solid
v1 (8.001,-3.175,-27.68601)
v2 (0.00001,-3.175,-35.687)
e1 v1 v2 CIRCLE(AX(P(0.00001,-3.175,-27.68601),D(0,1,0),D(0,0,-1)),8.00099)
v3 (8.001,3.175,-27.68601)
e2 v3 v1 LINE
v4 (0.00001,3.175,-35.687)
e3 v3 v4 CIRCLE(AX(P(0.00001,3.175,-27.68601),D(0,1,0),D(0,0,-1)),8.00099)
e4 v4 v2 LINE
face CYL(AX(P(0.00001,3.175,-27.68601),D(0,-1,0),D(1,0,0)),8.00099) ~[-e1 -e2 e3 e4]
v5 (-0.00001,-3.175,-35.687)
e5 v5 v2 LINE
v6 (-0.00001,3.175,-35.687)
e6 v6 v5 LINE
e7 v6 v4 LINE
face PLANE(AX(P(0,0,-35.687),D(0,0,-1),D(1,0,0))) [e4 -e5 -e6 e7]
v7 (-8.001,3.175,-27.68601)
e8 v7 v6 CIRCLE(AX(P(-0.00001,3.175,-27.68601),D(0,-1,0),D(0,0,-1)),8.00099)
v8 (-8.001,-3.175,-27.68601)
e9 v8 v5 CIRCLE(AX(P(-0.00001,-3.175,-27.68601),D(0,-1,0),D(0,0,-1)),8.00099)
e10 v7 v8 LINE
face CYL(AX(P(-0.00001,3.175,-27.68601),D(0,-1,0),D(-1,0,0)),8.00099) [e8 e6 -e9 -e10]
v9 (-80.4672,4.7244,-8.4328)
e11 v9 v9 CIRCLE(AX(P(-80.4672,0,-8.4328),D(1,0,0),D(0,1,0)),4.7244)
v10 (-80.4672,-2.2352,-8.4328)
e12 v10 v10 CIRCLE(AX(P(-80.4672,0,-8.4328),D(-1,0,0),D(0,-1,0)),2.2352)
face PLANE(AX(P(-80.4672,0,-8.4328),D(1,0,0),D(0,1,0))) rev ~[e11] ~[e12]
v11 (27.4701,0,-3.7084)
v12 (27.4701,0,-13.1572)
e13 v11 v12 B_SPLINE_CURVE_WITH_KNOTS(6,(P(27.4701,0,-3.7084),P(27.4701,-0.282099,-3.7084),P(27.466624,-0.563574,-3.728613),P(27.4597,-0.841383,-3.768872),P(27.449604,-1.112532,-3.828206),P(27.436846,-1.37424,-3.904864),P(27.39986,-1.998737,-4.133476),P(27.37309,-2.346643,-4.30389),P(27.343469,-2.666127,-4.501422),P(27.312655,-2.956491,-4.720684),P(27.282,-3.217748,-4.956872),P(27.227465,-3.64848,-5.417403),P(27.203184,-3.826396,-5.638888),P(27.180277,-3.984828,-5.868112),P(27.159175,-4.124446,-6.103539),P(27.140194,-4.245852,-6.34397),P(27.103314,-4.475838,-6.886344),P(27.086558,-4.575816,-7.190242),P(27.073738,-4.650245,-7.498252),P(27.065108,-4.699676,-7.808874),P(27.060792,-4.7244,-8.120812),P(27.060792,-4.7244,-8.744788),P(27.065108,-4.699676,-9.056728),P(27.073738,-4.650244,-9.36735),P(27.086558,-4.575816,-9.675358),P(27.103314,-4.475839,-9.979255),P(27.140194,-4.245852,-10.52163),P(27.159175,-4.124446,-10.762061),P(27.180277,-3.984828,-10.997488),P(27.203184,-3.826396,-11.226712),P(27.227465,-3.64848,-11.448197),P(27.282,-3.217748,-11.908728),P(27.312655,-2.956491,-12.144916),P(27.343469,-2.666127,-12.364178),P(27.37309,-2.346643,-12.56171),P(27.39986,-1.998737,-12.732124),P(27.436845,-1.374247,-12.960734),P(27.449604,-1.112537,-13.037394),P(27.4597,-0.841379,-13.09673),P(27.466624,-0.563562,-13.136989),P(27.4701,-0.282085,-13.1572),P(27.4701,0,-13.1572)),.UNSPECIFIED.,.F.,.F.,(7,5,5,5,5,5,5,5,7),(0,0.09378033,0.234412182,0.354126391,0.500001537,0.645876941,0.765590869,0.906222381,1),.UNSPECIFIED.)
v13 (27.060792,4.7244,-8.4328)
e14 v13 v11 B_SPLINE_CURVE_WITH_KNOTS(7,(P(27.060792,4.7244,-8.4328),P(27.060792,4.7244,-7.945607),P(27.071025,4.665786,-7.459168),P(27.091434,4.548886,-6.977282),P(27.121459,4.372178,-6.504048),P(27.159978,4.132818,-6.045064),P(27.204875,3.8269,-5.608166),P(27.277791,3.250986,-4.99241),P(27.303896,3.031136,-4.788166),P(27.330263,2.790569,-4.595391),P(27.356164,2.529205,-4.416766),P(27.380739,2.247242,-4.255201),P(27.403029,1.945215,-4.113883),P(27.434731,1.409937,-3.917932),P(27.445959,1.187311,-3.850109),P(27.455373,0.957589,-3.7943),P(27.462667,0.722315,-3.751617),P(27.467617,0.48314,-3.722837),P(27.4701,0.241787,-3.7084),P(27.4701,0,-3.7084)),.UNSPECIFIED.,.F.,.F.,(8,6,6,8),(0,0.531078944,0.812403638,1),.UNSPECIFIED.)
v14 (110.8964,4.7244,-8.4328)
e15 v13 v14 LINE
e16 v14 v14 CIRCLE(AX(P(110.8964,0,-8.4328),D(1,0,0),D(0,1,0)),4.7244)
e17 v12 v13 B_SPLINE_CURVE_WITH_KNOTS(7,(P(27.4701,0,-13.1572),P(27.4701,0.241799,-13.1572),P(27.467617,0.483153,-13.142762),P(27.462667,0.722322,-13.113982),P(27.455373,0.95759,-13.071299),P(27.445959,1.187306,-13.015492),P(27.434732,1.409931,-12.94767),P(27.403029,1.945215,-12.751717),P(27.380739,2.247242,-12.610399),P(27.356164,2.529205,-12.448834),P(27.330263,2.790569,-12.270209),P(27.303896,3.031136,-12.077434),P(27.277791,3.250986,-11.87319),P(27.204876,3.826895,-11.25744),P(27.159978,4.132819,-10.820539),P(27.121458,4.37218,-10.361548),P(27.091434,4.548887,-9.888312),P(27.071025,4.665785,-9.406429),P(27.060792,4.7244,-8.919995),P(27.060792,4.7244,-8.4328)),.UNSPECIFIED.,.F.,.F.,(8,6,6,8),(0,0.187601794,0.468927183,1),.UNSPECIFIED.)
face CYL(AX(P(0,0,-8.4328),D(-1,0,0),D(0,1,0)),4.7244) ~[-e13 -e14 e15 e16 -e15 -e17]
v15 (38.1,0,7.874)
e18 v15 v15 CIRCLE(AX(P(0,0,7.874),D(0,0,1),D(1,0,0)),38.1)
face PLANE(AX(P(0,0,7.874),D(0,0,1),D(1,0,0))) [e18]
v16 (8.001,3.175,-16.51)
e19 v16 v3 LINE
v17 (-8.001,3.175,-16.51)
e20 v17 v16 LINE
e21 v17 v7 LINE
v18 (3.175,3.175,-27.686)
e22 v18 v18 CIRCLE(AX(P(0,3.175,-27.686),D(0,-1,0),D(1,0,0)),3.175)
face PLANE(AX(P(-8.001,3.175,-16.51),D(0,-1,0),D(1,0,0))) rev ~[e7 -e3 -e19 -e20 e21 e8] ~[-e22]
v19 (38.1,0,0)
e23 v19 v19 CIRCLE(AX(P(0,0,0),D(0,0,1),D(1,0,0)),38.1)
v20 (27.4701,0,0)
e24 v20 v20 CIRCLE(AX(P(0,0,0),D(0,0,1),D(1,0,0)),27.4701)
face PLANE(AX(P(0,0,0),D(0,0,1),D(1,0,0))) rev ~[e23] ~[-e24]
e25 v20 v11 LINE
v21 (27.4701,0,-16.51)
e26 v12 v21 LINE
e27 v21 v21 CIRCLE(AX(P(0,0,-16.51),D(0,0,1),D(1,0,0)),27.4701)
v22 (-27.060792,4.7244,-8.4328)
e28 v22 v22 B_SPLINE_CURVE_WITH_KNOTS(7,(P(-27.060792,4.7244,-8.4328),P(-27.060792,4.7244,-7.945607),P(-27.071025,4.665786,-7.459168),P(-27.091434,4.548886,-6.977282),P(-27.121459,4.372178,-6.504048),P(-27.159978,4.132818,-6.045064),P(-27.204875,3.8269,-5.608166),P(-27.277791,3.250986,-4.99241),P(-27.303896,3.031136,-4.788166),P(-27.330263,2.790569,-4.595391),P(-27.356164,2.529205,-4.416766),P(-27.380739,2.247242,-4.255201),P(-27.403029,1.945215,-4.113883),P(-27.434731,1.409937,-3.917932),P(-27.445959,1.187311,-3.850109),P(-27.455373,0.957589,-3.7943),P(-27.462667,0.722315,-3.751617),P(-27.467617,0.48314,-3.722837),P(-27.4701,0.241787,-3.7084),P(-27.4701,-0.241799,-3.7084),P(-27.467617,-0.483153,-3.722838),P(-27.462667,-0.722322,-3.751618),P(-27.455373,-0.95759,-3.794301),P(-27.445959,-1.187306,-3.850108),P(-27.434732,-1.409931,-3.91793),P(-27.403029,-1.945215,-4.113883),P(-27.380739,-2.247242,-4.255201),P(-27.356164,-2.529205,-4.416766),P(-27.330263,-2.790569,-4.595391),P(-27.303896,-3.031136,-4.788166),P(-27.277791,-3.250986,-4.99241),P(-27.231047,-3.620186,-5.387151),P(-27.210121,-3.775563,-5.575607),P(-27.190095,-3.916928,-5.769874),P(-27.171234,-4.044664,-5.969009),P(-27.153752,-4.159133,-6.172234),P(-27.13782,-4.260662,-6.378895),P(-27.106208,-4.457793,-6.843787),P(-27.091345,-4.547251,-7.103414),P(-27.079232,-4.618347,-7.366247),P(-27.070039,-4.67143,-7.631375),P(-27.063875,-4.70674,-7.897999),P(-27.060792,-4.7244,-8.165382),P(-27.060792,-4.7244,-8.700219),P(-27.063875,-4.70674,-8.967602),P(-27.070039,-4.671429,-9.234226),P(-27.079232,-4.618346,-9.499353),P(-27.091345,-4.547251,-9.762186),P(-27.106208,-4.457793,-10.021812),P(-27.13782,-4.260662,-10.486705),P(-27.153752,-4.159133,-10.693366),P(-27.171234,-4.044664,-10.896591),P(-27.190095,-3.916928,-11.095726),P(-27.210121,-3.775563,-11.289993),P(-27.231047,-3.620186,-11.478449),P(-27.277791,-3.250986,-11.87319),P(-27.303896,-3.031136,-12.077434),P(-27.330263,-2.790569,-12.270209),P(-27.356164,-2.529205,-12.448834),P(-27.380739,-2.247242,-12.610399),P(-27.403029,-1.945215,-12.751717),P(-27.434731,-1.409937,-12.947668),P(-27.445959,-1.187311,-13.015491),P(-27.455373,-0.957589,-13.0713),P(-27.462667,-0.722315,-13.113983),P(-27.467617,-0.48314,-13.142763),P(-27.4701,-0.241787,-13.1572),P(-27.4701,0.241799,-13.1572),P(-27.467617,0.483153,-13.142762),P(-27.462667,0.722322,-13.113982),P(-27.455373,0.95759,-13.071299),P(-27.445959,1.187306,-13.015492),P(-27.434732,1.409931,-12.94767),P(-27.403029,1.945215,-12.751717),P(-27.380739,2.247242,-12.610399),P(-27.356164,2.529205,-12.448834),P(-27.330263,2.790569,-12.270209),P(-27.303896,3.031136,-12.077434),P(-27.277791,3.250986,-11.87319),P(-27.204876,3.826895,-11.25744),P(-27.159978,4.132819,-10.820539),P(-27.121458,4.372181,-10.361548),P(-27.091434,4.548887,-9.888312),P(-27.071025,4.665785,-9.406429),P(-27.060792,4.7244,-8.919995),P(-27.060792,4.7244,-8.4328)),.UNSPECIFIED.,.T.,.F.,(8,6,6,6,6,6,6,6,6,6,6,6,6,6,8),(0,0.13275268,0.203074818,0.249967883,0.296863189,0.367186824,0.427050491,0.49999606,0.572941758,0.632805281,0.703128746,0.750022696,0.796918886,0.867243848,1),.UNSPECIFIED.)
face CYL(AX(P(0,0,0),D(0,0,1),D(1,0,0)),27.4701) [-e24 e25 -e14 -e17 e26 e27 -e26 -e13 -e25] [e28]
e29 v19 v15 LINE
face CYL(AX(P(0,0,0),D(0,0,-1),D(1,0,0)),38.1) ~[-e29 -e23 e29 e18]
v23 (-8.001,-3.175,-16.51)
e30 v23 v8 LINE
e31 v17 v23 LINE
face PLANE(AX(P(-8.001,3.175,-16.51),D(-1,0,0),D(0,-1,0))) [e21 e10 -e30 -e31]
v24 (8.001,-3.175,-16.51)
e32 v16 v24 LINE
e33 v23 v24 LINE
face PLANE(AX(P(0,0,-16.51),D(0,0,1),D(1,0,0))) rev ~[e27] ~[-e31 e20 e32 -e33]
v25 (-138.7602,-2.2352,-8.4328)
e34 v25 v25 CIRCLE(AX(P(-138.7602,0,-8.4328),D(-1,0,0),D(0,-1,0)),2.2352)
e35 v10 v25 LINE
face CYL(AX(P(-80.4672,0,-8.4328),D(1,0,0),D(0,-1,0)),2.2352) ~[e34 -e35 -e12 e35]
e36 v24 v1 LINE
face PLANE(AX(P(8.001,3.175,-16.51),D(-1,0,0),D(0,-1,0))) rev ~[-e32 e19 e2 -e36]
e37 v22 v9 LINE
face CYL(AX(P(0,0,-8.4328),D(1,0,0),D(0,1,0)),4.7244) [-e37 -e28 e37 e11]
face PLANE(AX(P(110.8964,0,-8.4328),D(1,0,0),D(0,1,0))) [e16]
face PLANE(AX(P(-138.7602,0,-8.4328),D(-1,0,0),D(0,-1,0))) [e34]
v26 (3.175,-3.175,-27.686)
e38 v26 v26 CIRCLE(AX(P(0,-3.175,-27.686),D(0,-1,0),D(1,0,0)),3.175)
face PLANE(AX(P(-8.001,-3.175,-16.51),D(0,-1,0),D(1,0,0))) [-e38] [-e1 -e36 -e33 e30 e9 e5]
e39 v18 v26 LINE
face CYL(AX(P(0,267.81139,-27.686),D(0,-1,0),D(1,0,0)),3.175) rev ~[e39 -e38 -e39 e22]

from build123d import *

# Parameters (mm, degrees)
F0_R      = 38.1
F1_DEPTH  = 7.874
F2_R      = 27.4701
F3_DEPTH  = 16.51
F4_R      = 4.7244
F5_DEPTH  = 110.8964
F6_DEPTH  = 80.4672
F7_R      = 2.2352
F8_DEPTH  = 58.293
F9_W      = 16.002
F9_H      = 6.35
F10_DEPTH = 19.177
F11_R     = 8.00099
F13_D     = 6.35


# Not quite as in the source:
# - a fillet or chamfer is up to 0.001 mm smaller than in the source, because OpenCascade refuses the exact size


with BuildPart() as f1:
    # F0 (on Top) → F1 (new body)
    with BuildSketch(Plane.XY):
        Circle(F0_R)
    extrude(amount=F1_DEPTH)

    # F2 (on Top) → F3 (join)
    with BuildSketch(Plane.XY):
        Circle(F2_R)
    extrude(amount=-F3_DEPTH)

    # F4 (on Right) → F5 (join)
    with BuildSketch(Plane.YZ):
        with Locations((0, -8.4328)):
            Circle(F4_R)
    extrude(amount=F5_DEPTH)

    # F4 (on Right) → F6 (join)
    with BuildSketch(Plane.YZ):
        with Locations((0, -8.4328)):
            Circle(F4_R)
    extrude(amount=-F6_DEPTH)

    # F7 (on face) → F8 (join)
    with BuildSketch(Plane(origin=(-80.4672, 0, 0), x_dir=(0, -1, 0), z_dir=(-1, 0, 0))):
        with Locations((0, -8.4328)):
            Circle(F7_R)
    extrude(amount=F8_DEPTH)

    # F9 (on face) → F10 (join)
    with BuildSketch(Plane(origin=(0, 0, -16.51), x_dir=(1, 0, 0), z_dir=(0, 0, -1))):
        Rectangle(F9_W, F9_H)
    extrude(amount=F10_DEPTH)

    # F11 (radius 8.001 in the source; OpenCascade refuses exactly that, so slightly less here)
    f11_edges = [f1.edges().sort_by_distance(p)[0] for p in [
        (8.001, 0, -35.687),
        (-8.001, 0, -35.687),
    ]]
    fillet(f11_edges, radius=F11_R)

    # F13 (through all)
    with Locations(Plane(origin=(0, 3.175, 0), x_dir=(-1, 0, 0), z_dir=(0, 1, 0))):
        with Locations((0, -27.686)):
            Hole(F13_D / 2)


solid = f1.part
